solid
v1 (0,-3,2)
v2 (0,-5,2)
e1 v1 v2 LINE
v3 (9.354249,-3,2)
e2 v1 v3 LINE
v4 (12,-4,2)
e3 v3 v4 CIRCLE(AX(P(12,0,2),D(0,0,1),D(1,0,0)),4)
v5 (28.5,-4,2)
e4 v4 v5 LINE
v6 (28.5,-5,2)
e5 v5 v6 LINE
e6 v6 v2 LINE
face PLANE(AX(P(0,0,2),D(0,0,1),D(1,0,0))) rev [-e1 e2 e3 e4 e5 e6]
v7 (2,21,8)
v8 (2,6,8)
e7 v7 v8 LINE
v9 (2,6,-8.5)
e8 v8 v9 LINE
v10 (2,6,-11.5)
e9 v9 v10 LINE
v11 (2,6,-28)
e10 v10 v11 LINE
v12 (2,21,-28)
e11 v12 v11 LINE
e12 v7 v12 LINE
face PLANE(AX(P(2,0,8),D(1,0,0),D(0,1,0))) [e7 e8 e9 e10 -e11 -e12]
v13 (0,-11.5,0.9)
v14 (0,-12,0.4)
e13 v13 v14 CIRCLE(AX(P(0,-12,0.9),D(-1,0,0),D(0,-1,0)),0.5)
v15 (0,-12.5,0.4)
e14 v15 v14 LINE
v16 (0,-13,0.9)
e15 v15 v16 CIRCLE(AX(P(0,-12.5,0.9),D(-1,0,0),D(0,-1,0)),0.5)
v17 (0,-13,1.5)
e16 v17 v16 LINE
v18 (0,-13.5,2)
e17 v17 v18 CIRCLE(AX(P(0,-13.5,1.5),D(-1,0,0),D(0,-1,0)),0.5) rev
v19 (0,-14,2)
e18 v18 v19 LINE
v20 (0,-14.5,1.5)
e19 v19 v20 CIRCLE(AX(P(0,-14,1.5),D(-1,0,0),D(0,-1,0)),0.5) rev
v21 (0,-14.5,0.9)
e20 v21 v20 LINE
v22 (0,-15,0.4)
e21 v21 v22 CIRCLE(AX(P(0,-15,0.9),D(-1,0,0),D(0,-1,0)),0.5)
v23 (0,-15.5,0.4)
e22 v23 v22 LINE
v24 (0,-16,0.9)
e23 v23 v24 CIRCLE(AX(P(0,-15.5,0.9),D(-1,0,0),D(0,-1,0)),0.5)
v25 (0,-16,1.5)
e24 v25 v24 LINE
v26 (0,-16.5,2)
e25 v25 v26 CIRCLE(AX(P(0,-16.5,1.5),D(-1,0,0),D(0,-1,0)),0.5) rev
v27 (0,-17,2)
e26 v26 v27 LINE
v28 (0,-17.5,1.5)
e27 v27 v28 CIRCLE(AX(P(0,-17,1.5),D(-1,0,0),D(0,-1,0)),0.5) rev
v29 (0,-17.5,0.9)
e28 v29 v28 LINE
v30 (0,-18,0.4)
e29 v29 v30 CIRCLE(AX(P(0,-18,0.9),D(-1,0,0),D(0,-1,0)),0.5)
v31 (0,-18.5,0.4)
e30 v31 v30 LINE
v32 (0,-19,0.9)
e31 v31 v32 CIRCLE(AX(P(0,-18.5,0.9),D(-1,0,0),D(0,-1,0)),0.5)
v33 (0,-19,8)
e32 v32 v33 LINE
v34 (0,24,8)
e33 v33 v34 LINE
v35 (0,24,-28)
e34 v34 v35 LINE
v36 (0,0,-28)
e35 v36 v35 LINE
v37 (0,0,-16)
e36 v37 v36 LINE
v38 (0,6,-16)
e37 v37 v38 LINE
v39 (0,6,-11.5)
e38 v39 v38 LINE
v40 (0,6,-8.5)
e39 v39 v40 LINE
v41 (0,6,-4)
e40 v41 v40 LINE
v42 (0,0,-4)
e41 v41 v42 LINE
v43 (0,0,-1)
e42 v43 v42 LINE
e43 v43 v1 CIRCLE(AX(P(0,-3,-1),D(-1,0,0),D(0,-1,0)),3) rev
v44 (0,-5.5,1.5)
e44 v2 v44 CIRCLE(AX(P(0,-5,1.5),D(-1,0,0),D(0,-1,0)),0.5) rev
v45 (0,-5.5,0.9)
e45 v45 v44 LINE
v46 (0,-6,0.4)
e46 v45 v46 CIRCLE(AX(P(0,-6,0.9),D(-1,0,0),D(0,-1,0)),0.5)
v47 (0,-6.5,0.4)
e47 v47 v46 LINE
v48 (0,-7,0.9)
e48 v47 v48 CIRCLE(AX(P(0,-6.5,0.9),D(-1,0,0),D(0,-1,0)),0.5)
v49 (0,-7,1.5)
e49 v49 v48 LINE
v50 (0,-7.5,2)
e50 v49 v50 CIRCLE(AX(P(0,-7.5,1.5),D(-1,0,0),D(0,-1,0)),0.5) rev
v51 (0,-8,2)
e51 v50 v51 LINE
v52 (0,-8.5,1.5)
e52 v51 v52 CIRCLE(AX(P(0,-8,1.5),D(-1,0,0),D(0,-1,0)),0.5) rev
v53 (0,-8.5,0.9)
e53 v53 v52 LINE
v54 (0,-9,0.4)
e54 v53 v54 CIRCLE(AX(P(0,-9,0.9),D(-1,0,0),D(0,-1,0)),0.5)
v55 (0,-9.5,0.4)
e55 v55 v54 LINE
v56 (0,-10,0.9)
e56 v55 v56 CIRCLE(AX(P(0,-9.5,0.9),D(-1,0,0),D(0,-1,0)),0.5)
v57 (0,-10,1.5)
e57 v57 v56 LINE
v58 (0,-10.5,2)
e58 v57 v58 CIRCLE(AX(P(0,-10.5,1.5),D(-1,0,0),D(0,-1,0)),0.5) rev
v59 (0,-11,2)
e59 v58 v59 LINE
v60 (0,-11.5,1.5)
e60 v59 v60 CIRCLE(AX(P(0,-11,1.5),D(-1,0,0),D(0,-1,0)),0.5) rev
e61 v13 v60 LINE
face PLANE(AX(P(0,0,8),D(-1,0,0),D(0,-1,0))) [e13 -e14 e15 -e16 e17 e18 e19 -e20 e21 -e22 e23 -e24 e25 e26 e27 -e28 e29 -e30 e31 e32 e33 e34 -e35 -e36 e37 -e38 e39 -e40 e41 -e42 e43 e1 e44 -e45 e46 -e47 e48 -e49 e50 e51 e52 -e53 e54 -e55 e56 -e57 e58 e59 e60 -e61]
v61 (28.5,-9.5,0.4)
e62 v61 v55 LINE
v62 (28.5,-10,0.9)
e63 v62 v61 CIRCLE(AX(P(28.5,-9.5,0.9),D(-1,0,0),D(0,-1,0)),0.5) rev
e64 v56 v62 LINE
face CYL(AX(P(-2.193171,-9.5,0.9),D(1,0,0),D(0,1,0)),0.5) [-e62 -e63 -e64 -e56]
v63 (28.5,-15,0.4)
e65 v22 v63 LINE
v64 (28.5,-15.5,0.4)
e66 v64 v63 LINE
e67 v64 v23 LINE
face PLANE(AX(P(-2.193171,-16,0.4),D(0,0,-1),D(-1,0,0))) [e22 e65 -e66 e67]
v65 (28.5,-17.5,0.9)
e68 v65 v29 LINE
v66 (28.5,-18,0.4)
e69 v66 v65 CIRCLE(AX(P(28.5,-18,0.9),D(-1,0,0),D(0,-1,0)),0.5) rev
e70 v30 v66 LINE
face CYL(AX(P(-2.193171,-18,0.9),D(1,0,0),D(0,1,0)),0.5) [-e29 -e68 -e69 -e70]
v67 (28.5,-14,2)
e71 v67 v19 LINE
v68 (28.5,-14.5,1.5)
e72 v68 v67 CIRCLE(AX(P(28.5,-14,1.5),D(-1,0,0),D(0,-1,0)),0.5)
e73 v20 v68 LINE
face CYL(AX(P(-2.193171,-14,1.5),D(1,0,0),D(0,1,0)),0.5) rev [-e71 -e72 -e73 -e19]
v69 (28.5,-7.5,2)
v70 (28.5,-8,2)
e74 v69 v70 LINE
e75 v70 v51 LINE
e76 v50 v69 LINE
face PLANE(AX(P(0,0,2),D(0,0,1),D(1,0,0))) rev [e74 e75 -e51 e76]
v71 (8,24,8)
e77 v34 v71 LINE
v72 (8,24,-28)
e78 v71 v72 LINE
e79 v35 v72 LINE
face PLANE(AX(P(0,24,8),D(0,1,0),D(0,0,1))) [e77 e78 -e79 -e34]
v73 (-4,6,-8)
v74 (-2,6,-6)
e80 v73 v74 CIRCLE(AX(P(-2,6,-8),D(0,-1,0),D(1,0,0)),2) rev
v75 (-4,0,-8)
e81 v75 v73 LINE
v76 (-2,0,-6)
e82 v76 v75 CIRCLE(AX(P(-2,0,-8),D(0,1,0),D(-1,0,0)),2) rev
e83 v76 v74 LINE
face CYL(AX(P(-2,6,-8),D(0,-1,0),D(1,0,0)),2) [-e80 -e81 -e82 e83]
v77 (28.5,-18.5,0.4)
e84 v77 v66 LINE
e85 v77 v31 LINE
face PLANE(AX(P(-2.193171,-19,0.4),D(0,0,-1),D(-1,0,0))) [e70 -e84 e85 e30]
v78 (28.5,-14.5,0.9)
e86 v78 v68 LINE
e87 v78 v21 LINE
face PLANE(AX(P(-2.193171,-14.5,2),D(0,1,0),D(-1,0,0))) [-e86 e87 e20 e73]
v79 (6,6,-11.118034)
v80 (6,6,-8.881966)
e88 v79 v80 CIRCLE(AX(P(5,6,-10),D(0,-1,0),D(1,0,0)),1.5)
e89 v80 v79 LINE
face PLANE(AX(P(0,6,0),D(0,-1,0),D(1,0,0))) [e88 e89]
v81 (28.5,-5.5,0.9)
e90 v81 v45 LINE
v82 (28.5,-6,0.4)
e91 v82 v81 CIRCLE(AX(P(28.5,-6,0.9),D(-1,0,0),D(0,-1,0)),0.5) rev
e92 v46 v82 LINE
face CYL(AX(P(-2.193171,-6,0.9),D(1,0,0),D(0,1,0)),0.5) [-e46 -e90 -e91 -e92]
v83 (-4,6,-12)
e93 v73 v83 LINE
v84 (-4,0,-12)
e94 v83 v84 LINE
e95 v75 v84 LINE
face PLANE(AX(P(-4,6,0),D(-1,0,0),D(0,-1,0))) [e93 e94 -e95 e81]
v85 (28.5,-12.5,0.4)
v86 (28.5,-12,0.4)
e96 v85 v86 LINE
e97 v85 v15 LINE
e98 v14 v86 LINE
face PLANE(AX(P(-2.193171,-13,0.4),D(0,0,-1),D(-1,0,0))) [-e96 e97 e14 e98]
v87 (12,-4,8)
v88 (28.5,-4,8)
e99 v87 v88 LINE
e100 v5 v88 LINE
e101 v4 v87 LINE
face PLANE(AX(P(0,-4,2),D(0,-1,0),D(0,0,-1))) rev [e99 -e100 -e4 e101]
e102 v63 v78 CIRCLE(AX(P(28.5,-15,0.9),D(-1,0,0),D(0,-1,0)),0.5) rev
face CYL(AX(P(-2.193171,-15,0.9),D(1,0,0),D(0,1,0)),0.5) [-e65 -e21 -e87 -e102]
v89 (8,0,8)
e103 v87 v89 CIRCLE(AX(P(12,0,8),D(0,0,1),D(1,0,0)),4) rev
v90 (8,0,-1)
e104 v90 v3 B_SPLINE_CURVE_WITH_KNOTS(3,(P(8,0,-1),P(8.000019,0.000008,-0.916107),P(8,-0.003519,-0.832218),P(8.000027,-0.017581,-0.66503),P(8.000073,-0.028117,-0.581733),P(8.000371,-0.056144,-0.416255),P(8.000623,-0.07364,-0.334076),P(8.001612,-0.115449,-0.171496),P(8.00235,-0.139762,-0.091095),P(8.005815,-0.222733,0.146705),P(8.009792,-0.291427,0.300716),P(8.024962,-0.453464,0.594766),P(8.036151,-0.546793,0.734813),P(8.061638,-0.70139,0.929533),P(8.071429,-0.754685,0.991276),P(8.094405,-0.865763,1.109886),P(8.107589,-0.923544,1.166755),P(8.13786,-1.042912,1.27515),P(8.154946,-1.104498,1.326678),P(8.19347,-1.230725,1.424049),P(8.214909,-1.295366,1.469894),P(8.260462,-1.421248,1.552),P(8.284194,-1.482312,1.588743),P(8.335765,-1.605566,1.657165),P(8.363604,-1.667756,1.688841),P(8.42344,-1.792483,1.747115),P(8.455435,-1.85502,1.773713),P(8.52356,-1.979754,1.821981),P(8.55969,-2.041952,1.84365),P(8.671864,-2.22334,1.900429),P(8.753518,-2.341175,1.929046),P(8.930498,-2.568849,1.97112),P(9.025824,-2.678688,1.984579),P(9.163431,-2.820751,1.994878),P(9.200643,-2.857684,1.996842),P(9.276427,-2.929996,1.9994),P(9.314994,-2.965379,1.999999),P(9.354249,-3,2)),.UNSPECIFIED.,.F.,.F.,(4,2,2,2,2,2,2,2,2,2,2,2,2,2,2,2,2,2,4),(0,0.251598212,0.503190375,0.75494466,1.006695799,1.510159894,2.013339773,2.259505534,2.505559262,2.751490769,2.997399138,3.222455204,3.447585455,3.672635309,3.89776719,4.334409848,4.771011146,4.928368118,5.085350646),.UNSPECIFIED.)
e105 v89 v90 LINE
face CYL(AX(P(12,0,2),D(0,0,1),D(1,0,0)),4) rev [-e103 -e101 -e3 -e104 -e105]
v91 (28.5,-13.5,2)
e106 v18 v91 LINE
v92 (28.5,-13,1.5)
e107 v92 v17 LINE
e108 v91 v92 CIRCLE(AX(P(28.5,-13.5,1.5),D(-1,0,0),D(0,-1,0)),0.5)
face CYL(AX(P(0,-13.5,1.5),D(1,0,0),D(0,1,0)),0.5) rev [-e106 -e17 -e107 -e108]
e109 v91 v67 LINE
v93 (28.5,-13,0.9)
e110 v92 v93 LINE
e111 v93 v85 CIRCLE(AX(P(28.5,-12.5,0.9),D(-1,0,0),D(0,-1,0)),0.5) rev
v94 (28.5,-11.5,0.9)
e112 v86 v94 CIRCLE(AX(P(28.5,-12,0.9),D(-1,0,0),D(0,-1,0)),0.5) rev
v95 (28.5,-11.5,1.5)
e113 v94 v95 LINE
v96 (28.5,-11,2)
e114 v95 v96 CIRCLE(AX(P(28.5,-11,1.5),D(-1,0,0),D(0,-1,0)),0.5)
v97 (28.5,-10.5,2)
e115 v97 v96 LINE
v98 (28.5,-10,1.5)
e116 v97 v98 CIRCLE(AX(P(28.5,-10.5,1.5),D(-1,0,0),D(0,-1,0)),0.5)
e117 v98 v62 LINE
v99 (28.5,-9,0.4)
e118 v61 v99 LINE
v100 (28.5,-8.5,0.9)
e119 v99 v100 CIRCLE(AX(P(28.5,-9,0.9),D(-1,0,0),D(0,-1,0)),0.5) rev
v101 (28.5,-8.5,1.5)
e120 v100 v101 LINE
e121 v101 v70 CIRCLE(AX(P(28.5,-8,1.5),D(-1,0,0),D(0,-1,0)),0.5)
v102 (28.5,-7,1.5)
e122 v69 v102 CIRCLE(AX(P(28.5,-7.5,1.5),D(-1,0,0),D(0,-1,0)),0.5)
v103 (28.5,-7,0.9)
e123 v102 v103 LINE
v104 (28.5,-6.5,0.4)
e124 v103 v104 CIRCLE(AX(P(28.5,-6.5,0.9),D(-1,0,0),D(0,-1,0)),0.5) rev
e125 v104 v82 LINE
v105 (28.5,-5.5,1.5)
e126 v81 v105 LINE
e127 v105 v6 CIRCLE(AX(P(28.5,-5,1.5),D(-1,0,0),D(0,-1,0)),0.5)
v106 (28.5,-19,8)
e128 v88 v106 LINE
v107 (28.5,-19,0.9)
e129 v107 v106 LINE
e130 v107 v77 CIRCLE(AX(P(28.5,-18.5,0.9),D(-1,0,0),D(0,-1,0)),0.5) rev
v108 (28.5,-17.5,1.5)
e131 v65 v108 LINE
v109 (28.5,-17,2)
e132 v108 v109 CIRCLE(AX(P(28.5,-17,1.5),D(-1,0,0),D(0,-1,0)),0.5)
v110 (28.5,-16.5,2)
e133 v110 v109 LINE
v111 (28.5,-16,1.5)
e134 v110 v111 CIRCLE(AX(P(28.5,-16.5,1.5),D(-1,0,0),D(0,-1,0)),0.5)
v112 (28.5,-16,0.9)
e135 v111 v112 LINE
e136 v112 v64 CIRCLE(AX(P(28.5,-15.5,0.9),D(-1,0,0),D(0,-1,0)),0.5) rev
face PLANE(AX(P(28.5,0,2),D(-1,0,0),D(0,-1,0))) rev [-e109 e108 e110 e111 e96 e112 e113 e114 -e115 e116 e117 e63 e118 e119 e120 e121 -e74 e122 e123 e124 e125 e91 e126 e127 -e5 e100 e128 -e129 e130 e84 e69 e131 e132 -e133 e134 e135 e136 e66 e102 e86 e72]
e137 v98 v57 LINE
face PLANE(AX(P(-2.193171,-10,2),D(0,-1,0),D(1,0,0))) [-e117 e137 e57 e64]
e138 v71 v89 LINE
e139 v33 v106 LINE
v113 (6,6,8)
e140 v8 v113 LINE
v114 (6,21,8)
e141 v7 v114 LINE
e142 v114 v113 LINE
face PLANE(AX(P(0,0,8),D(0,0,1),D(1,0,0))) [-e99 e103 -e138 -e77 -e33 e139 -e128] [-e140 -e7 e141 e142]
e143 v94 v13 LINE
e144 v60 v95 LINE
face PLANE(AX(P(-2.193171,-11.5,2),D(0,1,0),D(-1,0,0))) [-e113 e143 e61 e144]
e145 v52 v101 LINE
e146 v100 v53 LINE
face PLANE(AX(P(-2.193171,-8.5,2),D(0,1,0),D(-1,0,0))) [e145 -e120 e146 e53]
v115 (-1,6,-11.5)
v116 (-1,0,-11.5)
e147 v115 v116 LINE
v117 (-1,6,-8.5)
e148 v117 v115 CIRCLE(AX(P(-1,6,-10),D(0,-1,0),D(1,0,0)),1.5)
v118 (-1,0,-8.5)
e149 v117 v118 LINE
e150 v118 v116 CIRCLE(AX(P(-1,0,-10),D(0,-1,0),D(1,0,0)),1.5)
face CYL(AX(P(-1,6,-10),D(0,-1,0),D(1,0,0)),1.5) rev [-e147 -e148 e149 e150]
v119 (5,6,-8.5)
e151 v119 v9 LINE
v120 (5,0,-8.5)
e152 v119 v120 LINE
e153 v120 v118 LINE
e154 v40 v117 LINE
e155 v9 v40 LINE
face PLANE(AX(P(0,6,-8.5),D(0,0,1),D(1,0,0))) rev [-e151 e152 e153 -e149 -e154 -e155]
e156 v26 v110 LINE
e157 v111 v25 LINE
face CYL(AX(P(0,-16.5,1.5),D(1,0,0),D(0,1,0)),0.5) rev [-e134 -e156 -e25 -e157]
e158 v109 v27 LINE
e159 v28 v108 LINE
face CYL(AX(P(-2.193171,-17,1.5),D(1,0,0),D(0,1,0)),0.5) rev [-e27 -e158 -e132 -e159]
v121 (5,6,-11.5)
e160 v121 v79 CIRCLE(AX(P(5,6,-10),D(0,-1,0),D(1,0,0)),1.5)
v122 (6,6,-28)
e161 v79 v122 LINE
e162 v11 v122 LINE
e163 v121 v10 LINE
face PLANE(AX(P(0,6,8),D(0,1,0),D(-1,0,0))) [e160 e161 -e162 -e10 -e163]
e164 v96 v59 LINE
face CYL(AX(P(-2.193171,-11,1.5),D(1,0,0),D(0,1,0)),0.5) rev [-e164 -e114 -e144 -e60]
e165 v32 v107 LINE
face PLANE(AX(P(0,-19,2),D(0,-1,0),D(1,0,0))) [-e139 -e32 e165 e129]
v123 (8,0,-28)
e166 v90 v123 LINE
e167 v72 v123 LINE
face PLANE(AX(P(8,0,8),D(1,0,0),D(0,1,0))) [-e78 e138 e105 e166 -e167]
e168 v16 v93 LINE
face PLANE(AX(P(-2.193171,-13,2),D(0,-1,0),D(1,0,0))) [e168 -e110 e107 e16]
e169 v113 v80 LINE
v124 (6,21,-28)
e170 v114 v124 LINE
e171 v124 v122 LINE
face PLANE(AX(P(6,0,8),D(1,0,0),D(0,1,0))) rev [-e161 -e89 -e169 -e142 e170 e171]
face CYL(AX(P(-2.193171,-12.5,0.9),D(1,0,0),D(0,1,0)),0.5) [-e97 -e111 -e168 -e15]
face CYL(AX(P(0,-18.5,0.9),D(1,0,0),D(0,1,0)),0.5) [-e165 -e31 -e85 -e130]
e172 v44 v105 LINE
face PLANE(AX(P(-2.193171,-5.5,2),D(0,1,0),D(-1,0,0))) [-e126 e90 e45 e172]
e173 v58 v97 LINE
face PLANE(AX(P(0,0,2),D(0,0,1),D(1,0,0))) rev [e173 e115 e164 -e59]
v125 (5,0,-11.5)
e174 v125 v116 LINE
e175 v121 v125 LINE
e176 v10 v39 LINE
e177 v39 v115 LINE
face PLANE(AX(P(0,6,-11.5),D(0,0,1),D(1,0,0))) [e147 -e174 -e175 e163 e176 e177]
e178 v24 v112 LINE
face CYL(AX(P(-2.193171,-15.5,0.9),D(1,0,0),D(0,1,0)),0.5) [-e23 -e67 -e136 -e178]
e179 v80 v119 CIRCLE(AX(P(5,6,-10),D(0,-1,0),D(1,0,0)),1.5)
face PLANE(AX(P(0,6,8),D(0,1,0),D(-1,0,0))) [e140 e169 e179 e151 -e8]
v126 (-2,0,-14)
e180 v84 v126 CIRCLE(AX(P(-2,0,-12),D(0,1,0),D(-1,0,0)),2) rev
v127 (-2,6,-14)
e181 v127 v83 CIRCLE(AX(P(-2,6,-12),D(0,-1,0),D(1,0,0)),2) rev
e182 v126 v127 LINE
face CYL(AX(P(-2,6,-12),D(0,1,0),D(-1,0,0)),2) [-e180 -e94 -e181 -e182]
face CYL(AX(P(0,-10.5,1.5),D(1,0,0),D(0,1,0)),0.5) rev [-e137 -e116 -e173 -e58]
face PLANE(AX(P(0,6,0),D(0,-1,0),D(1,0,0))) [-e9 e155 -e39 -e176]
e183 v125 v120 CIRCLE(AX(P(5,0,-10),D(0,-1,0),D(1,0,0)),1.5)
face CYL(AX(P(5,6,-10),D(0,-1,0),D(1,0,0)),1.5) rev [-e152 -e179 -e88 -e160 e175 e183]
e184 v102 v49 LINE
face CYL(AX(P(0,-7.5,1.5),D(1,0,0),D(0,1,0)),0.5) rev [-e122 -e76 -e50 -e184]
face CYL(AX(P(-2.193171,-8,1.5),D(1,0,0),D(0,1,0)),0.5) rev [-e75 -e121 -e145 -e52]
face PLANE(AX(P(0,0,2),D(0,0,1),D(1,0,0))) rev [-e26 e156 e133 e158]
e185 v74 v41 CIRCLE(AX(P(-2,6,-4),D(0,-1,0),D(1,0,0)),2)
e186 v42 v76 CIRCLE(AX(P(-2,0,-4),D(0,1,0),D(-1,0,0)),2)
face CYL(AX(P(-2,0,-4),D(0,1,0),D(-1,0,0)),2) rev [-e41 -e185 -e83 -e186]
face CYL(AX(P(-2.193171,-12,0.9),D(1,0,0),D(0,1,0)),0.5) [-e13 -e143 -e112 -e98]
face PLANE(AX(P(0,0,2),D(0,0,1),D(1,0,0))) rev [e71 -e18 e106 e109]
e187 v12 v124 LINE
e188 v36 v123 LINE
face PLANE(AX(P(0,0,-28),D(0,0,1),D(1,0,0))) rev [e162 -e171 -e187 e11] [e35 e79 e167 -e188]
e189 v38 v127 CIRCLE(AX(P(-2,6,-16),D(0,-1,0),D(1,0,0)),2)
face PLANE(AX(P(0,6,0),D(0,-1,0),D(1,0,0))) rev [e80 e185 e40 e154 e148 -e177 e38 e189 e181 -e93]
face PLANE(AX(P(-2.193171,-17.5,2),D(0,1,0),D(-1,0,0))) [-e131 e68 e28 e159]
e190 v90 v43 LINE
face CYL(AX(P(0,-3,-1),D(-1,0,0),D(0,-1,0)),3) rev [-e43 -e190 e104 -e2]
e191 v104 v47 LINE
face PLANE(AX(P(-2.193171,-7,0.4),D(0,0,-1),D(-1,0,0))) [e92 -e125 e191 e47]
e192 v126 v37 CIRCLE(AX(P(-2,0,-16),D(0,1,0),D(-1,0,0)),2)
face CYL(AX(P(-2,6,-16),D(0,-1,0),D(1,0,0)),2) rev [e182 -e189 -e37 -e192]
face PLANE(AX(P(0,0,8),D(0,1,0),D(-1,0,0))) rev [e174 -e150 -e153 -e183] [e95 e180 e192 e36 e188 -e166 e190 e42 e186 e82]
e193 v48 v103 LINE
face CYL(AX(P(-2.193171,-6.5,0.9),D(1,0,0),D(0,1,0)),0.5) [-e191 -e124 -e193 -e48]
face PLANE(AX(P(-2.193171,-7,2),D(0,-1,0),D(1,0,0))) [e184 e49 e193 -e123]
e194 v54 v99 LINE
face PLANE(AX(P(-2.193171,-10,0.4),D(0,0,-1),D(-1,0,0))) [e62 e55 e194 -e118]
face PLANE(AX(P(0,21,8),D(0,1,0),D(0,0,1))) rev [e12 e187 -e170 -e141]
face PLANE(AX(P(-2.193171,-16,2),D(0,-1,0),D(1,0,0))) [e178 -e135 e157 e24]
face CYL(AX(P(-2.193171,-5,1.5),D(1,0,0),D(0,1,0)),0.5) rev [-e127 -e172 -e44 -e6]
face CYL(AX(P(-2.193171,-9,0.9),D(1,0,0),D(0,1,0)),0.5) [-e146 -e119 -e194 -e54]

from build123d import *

# Parameters (mm, degrees)
SKETCH_1_W          = 8
SKETCH_1_H          = 24
SKETCH_1_W_2        = 4
SKETCH_1_H_2        = 15
EXTRUDE_1_DEPTH     = 8
SKETCH_1_3_W        = 8
SKETCH_1_3_H        = 24
SKETCH_1_3_W_2      = 4
SKETCH_1_3_H_2      = 15
EXTRUDE_2_DEPTH     = 28
EXTRUDE_4_DEPTH     = 6
CUT_EXTRUDE_2_DEPTH = 6
SKETCH_4_W          = 8
SKETCH_4_H          = 4
EXTRUDE_5_DEPTH     = 6
FILLET_1_R          = 2
FILLET_2_R          = 3
FILLET_3_R          = 4
SKETCH_6_W          = 1.6
SKETCH_6_H          = 1.5
EXTRUDE_7_DEPTH     = 28.5
FILLET_5_R          = 0.5


with BuildPart() as part:
    # Эскиз1 → Бобышка-Вытянуть1 (new body)
    with BuildSketch(Plane.XY):
        with Locations((4, 12)):
            Rectangle(SKETCH_1_W, SKETCH_1_H)
        with Locations((4, 13.5)):
            Rectangle(SKETCH_1_W_2, SKETCH_1_H_2, mode=Mode.SUBTRACT)
    extrude(amount=EXTRUDE_1_DEPTH)

    # Эскиз1<3> → Бобышка-Вытянуть2 (add)
    with BuildSketch(Plane.XY):
        with Locations((4, 12)):
            Rectangle(SKETCH_1_3_W, SKETCH_1_3_H)
        with Locations((4, 13.5)):
            Rectangle(SKETCH_1_3_W_2, SKETCH_1_3_H_2, mode=Mode.SUBTRACT)
    extrude(amount=-EXTRUDE_2_DEPTH)

    # Эскиз3 → Бобышка-Вытянуть4 (add)
    with BuildSketch(Plane.XZ):
        with BuildLine():
            Line((0, -14), (0, -11.5))
            Line((0, -11.5), (-1, -11.5))
            ThreePointArc((-1, -11.5), (-2.5, -10), (-1, -8.5))
            Line((-1, -8.5), (0, -8.5))
            Line((0, -8.5), (0, -6))
            Line((0, -6), (-4, -6))
            Line((-4, -6), (-4, -14))
            Line((-4, -14), (0, -14))
        make_face()
    extrude(amount=-EXTRUDE_4_DEPTH)

    # Эскиз3<3> → Вырез-Вытянуть2 (cut)
    with BuildSketch(Plane.XZ):
        with BuildLine():
            Line((-1, -11.5), (0, -11.5))
            Line((0, -11.5), (0, -8.5))
            Line((0, -8.5), (-1, -8.5))
            ThreePointArc((-1, -8.5), (-2.5, -10), (-1, -11.5))
        make_face()
        with BuildLine():
            Line((0, -11.5), (5, -11.5))
            ThreePointArc((5, -11.5), (6.5, -10), (5, -8.5))
            Line((5, -8.5), (0, -8.5))
            Line((0, -8.5), (0, -11.5))
        make_face()
    extrude(amount=-CUT_EXTRUDE_2_DEPTH, mode=Mode.SUBTRACT)

    # Эскиз4 → Бобышка-Вытянуть5 (add)
    with BuildSketch(Plane.XY.offset(8)):
        Polygon((8, -4), (0, -4), (0, -19), (28.5, -19), (28.5, -4), align=None)
        with Locations((4, -2)):
            Rectangle(SKETCH_4_W, SKETCH_4_H)
    extrude(amount=-EXTRUDE_5_DEPTH)

    # Скругление1
    fillet_1_edges = [part.edges().sort_by_distance(p)[0] for p in [
        (0, 3, -14),
        (0, 3, -6),
    ]]
    fillet(fillet_1_edges, radius=FILLET_1_R)
    fillet_1_2_edges = [part.edges().sort_by_distance(p)[0] for p in [
        (-4, 3, -14),
        (-4, 3, -6),
    ]]
    fillet(fillet_1_2_edges, radius=FILLET_1_R - 0.0001)  # a hair under: the kernel refuses the full size

    # Скругление2
    fillet_2_edges = [part.edges().sort_by_distance(p)[0] for p in [
        (4, 0, 2),
    ]]
    fillet(fillet_2_edges, radius=FILLET_2_R)

    # Скругление3
    fillet_3_edges = [part.edges().sort_by_distance(p)[0] for p in [
        (8, -4, 5),
    ]]
    fillet(fillet_3_edges, radius=FILLET_3_R - 0.0001)  # a hair under: the kernel refuses the full size

    # Эскиз6 → Бобышка-Вытянуть7 (add)
    with BuildSketch(Plane(origin=(28.5, 0, 0), x_dir=(0, 0, -1), z_dir=(1, 0, 0))):
        with Locations((-1.2, -15.25)):
            Rectangle(SKETCH_6_W, SKETCH_6_H)
        with Locations((-1.2, -18.25)):
            Rectangle(SKETCH_6_W, SKETCH_6_H)
        with Locations((-1.2, -12.25)):
            Rectangle(SKETCH_6_W, SKETCH_6_H)
        with Locations((-1.2, -9.25)):
            Rectangle(SKETCH_6_W, SKETCH_6_H)
        with Locations((-1.2, -6.25)):
            Rectangle(SKETCH_6_W, SKETCH_6_H)
    extrude(amount=-EXTRUDE_7_DEPTH)

    # Скругление5
    fillet_5_edges = [part.edges().sort_by_distance(p)[0] for p in [
        (14.25, -19, 0.4),
        (14.25, -17.5, 0.4),
        (14.25, -17.5, 2),
        (14.25, -14.5, 0.4),
        (14.25, -14.5, 2),
        (14.25, -16, 2),
        (14.25, -16, 0.4),
        (14.25, -11.5, 0.4),
        (14.25, -11.5, 2),
        (14.25, -13, 2),
        (14.25, -13, 0.4),
        (14.25, -8.5, 0.4),
        (14.25, -8.5, 2),
        (14.25, -10, 2),
        (14.25, -10, 0.4),
        (14.25, -5.5, 0.4),
        (14.25, -5.5, 2),
        (14.25, -7, 2),
        (14.25, -7, 0.4),
    ]]
    fillet(fillet_5_edges, radius=FILLET_5_R)


solid = part.part
